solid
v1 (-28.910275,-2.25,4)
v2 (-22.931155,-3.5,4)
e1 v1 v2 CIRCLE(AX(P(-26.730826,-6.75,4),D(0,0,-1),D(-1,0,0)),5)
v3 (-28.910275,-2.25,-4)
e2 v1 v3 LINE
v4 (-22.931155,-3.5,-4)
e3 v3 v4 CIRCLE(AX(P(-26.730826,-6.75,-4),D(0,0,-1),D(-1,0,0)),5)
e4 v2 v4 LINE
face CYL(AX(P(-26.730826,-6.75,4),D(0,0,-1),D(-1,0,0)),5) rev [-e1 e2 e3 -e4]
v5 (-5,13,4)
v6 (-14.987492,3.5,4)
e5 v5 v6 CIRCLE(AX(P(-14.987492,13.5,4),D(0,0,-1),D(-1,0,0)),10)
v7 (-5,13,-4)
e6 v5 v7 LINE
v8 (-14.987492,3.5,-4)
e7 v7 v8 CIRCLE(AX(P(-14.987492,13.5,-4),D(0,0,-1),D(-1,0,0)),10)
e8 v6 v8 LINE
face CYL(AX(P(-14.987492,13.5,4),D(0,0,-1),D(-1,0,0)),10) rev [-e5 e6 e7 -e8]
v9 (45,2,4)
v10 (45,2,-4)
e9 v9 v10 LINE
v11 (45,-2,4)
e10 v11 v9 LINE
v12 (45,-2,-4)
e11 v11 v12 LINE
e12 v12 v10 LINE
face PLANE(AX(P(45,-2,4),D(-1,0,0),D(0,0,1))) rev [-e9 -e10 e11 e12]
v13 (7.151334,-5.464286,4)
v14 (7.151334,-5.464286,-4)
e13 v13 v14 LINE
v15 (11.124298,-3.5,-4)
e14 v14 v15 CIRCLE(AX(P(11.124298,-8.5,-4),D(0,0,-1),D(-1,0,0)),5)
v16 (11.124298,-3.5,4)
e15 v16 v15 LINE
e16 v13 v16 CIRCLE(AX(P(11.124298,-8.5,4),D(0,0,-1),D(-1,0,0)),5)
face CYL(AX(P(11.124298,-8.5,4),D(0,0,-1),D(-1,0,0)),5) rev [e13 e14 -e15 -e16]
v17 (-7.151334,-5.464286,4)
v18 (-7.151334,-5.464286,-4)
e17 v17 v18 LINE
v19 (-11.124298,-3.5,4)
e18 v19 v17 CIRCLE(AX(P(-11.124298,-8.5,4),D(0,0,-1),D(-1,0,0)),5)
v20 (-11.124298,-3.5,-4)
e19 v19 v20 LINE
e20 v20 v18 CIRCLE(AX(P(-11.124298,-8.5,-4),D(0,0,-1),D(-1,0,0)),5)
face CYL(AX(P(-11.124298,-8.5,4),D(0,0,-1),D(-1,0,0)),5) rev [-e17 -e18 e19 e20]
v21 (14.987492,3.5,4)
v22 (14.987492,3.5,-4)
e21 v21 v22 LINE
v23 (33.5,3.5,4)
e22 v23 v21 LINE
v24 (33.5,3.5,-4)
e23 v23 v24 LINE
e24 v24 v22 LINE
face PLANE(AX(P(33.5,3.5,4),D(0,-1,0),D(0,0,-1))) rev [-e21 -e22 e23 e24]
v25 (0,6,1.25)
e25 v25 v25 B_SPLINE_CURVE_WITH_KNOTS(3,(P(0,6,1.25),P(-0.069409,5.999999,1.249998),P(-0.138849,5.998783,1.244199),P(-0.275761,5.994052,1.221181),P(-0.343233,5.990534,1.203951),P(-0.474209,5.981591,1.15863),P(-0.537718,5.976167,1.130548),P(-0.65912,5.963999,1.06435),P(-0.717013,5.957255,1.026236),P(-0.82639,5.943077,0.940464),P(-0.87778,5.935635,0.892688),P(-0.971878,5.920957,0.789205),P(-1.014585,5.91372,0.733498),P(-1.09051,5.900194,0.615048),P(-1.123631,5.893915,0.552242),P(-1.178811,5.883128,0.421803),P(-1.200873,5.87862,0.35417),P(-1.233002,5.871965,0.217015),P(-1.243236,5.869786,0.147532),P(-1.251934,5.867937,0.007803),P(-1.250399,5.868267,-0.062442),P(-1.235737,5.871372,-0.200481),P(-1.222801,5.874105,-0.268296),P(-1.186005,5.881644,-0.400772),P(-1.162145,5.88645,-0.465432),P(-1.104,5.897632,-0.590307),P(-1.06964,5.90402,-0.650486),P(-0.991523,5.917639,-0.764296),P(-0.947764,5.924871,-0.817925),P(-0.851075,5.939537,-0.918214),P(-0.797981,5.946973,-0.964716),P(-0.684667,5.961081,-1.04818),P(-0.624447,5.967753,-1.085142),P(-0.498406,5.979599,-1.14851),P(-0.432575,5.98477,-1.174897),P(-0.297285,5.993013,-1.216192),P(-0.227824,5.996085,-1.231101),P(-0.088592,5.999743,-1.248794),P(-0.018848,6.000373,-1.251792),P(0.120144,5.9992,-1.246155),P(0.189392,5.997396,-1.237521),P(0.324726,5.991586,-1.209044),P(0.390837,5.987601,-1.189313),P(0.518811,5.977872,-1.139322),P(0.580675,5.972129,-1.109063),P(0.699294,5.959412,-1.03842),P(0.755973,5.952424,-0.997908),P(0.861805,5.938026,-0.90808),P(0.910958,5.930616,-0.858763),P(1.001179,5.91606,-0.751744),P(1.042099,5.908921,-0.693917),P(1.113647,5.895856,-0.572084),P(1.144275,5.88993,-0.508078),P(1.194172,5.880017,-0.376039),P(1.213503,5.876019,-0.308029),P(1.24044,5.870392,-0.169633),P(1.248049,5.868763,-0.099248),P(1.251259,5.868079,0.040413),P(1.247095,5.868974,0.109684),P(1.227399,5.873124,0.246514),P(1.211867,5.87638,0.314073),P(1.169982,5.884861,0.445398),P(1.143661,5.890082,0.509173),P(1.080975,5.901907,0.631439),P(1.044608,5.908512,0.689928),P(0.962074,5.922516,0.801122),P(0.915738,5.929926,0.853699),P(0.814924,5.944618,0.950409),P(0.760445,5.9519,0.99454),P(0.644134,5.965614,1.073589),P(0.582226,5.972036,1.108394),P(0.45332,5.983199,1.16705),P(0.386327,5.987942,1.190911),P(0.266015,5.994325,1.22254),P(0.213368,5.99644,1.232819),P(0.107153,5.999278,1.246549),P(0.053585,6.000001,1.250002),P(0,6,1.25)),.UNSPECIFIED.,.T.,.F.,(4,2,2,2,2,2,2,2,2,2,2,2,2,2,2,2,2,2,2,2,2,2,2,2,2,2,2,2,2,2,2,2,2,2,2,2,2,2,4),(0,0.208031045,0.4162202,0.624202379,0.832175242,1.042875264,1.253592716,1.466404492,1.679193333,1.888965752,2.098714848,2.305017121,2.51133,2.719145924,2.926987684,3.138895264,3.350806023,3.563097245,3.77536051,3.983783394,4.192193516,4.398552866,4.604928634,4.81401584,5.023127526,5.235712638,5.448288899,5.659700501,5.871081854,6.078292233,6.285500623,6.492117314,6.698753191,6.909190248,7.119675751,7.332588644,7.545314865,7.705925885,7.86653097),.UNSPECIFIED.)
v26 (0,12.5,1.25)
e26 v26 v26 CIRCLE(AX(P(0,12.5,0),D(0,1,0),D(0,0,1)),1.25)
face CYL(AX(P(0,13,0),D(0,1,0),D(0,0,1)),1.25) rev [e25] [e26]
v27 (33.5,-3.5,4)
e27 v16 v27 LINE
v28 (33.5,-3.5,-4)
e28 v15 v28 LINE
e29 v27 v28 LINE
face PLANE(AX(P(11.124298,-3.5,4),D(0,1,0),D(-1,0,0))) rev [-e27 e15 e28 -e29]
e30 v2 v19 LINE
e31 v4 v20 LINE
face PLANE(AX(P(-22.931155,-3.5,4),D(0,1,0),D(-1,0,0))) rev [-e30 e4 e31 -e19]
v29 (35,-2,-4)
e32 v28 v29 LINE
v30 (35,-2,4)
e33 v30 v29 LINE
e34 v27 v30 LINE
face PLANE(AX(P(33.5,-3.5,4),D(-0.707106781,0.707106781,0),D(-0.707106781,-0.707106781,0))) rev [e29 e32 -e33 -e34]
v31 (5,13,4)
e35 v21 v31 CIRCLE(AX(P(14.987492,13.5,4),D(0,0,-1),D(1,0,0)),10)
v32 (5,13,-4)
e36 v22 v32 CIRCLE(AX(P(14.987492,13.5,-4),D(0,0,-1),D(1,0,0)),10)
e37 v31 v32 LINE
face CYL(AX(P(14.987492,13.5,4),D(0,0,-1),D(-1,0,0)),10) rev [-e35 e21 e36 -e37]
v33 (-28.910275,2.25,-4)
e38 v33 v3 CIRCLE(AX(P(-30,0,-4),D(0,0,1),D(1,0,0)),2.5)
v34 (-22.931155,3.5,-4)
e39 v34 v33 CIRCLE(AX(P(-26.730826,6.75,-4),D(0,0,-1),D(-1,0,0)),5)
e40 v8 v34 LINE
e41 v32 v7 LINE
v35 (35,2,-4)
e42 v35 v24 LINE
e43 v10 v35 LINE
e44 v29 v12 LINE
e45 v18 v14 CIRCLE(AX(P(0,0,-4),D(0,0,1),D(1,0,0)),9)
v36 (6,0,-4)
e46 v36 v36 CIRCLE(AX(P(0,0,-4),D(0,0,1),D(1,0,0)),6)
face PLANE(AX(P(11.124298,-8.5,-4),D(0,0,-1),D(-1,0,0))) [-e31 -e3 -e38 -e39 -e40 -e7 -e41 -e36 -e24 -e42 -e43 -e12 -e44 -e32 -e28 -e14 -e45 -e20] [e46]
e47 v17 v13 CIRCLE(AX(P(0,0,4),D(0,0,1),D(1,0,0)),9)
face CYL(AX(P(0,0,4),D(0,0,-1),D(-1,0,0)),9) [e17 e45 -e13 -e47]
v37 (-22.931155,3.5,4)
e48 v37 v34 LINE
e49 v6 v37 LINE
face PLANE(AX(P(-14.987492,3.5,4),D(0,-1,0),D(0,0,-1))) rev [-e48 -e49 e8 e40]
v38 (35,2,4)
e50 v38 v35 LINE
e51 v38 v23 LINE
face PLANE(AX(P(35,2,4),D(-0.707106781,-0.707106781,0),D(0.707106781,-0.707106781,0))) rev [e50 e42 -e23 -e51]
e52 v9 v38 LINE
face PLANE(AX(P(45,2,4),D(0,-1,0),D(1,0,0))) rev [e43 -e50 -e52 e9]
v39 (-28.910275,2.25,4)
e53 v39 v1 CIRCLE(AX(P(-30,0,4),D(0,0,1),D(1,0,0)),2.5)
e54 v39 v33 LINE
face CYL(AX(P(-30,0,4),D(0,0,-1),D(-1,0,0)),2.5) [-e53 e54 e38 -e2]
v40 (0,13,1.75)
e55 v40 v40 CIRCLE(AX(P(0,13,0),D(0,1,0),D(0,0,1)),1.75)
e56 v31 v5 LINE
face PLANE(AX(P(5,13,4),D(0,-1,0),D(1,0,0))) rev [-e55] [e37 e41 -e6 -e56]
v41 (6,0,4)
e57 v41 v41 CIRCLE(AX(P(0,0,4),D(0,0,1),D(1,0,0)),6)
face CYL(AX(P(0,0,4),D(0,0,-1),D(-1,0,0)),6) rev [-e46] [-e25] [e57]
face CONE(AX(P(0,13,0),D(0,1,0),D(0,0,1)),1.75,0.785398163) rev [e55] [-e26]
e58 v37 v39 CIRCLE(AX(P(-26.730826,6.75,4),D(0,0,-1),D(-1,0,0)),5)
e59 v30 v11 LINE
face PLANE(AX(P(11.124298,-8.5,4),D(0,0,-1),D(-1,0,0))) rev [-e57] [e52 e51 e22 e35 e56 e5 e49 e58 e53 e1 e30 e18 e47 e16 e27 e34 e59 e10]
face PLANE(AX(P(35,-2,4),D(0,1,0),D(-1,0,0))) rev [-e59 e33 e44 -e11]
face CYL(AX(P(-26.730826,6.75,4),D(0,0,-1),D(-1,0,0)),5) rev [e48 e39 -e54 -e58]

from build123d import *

# Parameters (mm, degrees)
SKETCH_1_R      = 6
EXTRUDE_1_DEPTH = 4


# Read off the part's stored shape, not the designer's step: Отверстие обработанное метчиком M31
with BuildPart() as part:
    # Эскиз1 → Бобышка-Вытянуть1 (new, symmetric)
    with BuildSketch(Plane.XY):
        with BuildLine():
            Line((11.124297731, -3.5), (33.5, -3.5))
            Line((33.5, -3.5), (35, -2))
            Line((35, -2), (45, -2))
            Line((45, -2), (45, 2))
            Line((45, 2), (35, 2))
            Line((35, 2), (33.5, 3.5))
            Line((33.5, 3.5), (14.987492178, 3.5))
            ThreePointArc((14.987492178, 3.5), (8.095467802, 6.254311627), (5, 13))
            Line((5, 13), (-5, 13))
            ThreePointArc((-5, 13), (-8.095467802, 6.254311627), (-14.987492178, 3.5))
            Line((-14.987492178, 3.5), (-22.931154754, 3.5))
            ThreePointArc((-22.931154754, 3.5), (-25.707642289, 1.855810024), (-28.910275264, 2.25))
            ThreePointArc((-28.910275264, 2.25), (-32.5, 0), (-28.910275264, -2.25))
            ThreePointArc((-28.910275264, -2.25), (-25.707642289, -1.855810024), (-22.931154754, -3.5))
            Line((-22.931154754, -3.5), (-11.124297731, -3.5))
            ThreePointArc((-11.124297731, -3.5), (-8.90828458, -4.017892715), (-7.151334255, -5.464285714))
            ThreePointArc((-7.151334255, -5.464285714), (0, -9), (7.151334255, -5.464285714))
            ThreePointArc((7.151334255, -5.464285714), (8.90828458, -4.017892715), (11.124297731, -3.5))
        make_face()
        Circle(SKETCH_1_R, mode=Mode.SUBTRACT)
    extrude(amount=EXTRUDE_1_DEPTH, both=True)

    # Отверстие обработанное метчиком M31 outline → Отверстие обработанное метчиком M31 (revolve, cut)
    with BuildSketch(Plane.XY):
        Polygon((0, 5.868327481), (1.25, 5.868327481), (1.25, 12.5), (1.75, 13), (0, 13), align=None)
    revolve(axis=Axis((0, 0, 0), (0, 1, 0)), mode=Mode.SUBTRACT)


solid = part.part
